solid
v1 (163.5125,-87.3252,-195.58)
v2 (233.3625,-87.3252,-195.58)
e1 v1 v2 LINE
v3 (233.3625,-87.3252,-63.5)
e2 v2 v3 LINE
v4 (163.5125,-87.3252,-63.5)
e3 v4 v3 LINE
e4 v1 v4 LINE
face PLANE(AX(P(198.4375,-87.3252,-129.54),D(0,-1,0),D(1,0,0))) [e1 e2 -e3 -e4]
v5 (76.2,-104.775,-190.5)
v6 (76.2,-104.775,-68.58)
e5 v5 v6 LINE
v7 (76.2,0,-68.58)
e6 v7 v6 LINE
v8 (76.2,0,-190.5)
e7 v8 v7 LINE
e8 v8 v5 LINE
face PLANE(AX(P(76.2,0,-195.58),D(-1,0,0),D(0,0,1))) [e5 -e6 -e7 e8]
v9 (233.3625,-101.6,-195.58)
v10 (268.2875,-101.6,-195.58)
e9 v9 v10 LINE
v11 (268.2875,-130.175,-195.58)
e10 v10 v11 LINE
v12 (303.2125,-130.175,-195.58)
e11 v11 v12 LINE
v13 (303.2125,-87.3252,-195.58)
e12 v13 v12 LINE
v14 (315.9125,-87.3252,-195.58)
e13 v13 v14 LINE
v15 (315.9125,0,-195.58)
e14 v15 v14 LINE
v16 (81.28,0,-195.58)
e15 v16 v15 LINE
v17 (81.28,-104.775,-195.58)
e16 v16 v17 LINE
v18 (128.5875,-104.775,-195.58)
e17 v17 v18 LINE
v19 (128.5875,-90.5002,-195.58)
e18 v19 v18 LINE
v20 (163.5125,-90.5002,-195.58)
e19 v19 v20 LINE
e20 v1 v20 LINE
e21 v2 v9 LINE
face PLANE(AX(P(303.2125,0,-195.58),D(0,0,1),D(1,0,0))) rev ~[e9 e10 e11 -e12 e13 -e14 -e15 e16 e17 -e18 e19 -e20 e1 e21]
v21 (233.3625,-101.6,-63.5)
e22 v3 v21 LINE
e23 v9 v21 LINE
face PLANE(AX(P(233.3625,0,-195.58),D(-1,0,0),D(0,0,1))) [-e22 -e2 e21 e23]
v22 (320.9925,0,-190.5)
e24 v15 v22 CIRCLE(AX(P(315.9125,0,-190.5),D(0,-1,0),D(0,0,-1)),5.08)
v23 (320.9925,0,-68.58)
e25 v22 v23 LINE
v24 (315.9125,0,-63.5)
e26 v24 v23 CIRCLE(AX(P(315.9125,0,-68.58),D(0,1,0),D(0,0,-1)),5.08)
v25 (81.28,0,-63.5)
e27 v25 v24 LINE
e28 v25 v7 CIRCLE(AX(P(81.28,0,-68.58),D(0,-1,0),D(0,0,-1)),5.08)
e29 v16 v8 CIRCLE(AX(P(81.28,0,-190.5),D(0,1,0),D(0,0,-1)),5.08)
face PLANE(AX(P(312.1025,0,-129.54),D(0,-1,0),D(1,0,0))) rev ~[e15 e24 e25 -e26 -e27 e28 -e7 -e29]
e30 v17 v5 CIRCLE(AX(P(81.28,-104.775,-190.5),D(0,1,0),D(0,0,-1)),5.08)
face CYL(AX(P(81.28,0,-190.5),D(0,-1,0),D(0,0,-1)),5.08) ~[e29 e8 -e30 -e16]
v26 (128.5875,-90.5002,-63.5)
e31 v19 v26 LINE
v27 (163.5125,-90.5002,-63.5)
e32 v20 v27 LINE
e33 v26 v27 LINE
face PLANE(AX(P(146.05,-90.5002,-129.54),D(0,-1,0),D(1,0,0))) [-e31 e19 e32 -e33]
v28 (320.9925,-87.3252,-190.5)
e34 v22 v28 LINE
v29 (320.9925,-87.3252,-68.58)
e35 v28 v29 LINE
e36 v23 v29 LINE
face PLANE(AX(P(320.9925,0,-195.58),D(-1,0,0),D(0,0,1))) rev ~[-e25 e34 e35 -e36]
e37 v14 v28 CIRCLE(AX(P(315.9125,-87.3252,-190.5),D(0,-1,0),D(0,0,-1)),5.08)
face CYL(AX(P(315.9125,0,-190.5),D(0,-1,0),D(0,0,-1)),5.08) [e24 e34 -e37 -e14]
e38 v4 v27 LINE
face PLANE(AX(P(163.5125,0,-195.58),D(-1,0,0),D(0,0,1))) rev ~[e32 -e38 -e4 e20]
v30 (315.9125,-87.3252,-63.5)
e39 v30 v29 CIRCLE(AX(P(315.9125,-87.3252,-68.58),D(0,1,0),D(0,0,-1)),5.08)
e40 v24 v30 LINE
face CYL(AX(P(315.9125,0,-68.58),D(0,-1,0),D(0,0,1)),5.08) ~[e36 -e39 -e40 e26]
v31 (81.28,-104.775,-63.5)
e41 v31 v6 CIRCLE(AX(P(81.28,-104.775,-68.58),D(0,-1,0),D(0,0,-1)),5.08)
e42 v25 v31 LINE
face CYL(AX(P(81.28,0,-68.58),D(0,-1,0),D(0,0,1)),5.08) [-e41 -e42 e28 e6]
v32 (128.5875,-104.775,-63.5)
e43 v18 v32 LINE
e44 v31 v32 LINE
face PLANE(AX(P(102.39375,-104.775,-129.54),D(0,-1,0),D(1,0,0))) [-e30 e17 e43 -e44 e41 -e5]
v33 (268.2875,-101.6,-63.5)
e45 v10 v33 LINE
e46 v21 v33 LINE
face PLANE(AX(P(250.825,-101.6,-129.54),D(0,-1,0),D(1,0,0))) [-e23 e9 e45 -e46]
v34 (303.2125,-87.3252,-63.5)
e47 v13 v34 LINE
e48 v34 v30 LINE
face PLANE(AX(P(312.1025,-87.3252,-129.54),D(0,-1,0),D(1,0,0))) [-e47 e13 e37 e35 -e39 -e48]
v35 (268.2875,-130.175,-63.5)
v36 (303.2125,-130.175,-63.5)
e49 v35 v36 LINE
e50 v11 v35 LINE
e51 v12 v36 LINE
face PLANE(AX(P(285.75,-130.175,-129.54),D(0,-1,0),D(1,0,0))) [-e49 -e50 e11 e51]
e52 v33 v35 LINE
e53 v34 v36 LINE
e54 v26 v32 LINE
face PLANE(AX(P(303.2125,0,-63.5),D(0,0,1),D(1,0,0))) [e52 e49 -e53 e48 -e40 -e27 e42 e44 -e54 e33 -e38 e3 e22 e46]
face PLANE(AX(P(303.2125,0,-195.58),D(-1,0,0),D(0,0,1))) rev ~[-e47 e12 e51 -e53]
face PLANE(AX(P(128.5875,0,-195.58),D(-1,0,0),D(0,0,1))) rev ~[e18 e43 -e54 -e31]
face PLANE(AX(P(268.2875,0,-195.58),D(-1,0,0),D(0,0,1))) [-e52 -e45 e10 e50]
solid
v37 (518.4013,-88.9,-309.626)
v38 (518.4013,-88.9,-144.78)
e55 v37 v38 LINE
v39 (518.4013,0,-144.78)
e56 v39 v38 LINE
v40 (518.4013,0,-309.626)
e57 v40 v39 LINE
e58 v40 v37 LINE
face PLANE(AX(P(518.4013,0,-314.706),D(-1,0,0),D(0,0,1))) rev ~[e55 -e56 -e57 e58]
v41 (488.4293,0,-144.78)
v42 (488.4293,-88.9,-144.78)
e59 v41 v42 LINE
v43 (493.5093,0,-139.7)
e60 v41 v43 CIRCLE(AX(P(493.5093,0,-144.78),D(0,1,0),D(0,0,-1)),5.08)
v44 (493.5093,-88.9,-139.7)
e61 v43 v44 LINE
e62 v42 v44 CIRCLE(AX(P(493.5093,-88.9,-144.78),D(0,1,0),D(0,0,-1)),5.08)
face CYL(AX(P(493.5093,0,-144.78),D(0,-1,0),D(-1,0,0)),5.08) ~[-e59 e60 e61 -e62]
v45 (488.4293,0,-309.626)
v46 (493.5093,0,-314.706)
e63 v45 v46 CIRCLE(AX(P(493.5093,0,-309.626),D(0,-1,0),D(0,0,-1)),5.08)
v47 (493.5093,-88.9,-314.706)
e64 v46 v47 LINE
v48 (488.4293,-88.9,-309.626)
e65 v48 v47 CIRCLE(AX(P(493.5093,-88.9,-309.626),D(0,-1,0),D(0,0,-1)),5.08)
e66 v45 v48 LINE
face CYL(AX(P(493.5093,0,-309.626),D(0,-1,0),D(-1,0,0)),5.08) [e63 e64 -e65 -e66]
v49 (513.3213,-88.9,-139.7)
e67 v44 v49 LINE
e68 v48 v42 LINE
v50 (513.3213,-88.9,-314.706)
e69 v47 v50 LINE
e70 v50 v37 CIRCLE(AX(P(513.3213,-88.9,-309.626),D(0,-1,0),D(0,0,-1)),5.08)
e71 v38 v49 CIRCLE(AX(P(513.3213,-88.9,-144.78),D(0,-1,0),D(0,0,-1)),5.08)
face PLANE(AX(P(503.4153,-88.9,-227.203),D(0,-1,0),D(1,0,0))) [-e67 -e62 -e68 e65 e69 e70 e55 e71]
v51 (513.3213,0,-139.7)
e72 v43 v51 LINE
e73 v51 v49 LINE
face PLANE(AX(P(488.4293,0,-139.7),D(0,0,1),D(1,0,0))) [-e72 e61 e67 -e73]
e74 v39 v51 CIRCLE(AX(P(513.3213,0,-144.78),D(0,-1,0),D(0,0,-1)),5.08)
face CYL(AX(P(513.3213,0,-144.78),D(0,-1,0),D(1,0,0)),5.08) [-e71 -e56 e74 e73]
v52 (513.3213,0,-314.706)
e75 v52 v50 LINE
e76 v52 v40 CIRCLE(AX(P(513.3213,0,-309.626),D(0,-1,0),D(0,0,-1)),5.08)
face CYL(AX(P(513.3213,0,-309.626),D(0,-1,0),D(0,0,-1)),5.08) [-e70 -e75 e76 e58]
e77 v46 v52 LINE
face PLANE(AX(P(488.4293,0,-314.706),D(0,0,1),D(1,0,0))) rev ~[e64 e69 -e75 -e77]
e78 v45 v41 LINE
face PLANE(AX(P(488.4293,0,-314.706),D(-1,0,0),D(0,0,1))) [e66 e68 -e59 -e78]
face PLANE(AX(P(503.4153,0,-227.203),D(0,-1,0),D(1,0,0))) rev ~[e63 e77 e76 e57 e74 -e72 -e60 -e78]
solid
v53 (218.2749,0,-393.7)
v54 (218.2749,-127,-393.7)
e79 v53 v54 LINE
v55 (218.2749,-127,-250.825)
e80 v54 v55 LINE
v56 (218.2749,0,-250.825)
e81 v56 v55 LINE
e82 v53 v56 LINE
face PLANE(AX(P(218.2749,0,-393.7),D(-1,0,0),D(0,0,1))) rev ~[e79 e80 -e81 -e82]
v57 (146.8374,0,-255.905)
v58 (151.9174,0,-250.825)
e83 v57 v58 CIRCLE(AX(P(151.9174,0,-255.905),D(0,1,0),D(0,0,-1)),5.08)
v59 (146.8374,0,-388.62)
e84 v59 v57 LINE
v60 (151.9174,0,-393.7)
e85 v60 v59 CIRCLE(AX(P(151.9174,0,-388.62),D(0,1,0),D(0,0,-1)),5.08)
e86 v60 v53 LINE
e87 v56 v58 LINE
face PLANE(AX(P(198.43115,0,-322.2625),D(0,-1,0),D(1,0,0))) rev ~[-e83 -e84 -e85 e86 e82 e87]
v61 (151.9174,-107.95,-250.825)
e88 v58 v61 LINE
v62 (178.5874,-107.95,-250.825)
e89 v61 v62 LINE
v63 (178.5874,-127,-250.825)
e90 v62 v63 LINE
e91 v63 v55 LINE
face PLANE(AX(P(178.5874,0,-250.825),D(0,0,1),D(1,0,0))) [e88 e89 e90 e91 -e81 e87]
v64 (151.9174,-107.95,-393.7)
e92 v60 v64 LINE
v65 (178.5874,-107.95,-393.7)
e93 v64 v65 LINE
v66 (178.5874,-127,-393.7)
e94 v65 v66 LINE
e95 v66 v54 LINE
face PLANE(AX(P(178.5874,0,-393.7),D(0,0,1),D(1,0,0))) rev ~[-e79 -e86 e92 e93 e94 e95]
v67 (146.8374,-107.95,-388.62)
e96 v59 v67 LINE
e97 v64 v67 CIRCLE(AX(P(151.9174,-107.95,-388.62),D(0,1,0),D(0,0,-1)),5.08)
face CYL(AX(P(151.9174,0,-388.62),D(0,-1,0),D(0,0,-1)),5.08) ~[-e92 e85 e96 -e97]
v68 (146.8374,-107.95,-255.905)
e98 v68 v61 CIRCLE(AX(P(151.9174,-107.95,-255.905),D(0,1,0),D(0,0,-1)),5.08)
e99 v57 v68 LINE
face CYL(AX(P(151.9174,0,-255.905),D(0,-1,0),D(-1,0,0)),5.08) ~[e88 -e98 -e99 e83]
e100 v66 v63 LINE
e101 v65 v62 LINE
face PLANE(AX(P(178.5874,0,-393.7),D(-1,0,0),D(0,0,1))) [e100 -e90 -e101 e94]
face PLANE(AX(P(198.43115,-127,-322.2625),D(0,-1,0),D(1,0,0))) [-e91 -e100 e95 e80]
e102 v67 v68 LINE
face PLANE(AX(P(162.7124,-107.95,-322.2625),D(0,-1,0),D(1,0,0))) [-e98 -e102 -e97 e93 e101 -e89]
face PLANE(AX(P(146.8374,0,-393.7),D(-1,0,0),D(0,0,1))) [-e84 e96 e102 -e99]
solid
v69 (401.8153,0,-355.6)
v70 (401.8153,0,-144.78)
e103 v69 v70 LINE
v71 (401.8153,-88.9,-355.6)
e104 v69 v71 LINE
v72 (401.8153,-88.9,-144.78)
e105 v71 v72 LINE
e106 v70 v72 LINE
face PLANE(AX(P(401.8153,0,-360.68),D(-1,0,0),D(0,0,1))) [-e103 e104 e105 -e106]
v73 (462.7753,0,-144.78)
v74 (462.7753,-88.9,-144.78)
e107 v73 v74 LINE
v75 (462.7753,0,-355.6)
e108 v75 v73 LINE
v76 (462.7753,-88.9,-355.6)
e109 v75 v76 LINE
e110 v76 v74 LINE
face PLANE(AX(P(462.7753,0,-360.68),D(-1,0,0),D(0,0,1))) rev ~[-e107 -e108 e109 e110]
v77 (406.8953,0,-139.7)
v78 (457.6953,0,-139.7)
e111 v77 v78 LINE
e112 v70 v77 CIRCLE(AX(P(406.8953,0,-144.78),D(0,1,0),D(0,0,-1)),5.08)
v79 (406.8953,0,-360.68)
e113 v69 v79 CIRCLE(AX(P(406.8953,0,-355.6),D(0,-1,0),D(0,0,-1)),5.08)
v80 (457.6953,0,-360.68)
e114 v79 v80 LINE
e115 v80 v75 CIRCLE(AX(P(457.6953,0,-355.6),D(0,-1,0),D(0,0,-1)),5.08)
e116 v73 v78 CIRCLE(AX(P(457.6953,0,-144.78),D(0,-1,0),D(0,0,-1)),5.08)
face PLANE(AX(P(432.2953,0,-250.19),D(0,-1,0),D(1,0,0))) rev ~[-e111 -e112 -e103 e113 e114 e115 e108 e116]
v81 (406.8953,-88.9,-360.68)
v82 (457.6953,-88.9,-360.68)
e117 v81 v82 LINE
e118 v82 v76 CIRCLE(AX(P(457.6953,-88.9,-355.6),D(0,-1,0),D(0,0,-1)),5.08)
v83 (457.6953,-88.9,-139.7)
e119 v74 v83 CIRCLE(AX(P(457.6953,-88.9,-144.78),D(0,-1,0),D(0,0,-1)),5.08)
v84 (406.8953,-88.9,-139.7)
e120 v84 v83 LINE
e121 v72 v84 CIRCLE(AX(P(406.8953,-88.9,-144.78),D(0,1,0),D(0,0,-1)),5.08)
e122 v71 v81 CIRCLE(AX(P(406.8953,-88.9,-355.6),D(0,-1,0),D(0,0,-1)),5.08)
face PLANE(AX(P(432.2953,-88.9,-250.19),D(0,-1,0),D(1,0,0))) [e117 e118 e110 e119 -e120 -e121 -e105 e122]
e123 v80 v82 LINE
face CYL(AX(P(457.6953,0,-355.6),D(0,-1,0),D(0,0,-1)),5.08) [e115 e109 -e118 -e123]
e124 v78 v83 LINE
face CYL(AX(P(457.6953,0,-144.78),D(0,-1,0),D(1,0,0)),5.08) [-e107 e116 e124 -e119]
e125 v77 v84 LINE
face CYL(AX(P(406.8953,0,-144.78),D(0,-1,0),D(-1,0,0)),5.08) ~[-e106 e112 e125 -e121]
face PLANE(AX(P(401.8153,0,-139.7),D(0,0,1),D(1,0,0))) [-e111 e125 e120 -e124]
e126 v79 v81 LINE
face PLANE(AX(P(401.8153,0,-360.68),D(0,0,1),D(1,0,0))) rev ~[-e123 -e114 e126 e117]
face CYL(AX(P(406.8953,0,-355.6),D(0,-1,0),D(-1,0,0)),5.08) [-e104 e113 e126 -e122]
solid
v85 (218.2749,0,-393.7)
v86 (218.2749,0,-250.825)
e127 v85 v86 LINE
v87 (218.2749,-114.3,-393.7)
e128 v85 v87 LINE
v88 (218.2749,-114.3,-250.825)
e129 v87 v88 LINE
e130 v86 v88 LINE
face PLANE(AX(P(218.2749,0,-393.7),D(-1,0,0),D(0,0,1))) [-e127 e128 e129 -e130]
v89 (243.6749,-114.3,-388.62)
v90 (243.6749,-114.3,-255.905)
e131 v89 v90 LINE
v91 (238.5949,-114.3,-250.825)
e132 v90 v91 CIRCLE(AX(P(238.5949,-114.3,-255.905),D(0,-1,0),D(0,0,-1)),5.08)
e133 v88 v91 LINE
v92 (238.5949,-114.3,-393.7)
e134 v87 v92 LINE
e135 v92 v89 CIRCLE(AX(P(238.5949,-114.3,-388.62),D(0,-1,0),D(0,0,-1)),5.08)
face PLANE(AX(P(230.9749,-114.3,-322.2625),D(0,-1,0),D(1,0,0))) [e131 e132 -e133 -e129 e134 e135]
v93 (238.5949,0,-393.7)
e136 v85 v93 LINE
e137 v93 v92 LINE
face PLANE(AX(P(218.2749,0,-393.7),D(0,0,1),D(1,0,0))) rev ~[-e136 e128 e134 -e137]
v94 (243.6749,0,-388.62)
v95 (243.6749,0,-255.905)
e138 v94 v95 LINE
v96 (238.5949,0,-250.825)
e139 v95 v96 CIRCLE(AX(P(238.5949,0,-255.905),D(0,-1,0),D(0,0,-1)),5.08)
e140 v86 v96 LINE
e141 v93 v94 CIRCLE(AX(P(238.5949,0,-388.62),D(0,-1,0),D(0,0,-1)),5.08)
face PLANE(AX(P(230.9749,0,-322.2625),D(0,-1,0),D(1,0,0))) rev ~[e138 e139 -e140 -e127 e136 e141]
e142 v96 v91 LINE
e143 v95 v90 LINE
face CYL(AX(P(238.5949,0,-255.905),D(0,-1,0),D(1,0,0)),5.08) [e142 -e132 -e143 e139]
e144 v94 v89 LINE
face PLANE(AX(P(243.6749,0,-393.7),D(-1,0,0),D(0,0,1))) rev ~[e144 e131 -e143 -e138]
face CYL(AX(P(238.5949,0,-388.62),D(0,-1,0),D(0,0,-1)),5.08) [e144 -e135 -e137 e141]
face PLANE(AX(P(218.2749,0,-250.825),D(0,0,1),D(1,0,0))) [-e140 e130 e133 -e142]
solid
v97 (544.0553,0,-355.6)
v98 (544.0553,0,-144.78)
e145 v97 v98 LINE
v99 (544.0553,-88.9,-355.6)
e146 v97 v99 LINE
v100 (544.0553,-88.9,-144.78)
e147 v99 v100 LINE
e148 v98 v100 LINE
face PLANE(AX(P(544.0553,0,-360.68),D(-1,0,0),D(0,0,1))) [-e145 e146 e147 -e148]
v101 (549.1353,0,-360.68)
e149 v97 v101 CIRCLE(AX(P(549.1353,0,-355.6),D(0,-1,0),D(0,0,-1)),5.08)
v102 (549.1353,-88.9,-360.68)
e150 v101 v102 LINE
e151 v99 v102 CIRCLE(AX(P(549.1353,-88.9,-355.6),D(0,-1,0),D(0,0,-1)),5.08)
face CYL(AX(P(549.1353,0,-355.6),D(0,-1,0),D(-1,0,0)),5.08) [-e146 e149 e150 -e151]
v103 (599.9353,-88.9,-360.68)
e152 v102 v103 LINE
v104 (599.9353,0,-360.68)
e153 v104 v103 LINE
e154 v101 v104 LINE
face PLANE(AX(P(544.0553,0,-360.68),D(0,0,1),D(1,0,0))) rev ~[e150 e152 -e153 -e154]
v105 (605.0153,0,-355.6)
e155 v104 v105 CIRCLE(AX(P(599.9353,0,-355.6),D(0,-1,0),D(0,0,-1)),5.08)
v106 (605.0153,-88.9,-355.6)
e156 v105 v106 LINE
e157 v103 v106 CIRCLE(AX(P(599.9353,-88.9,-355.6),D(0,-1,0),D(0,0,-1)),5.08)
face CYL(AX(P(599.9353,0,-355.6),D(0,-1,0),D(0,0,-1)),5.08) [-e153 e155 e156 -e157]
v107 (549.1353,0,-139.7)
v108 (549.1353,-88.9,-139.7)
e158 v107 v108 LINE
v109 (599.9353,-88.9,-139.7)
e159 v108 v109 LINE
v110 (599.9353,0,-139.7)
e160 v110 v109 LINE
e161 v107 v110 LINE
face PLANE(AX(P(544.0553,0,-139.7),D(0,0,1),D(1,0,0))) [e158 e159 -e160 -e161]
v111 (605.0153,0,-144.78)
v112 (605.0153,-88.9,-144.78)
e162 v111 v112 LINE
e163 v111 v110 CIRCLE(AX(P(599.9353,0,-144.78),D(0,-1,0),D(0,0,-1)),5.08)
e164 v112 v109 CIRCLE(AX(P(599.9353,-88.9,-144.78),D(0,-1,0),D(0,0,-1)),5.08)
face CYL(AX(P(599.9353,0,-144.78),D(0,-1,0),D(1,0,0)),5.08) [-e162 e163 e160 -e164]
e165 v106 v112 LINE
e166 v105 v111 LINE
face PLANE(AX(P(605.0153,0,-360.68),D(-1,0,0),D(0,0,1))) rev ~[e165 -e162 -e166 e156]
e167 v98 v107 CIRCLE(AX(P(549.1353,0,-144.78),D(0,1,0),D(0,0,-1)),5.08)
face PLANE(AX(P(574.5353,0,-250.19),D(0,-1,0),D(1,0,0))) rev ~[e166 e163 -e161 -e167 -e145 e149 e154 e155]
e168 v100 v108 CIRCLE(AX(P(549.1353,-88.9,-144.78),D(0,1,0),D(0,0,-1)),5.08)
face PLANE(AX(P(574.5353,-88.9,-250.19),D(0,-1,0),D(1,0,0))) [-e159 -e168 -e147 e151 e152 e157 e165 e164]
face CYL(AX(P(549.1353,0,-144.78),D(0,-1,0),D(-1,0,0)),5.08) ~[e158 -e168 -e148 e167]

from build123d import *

# Parameters (mm, degrees)
F0_W      = 60.96
F0_H      = 220.98
F1_DEPTH  = 88.9
F0_W_2    = 29.972
F0_H_2    = 175.006
F2_R      = 5.08
F2_2_R    = 5.08
F2_3_R    = 5.08
F3_R      = 5.08
F0_W_3    = 52.3875
F0_H_3    = 132.08
F4_DEPTH  = 104.775
F0_W_4    = 34.925
F5_DEPTH  = 90.5002
F0_W_5    = 69.85
F6_DEPTH  = 87.3252
F7_DEPTH  = 101.6
F8_DEPTH  = 130.175
F0_W_6    = 17.78
F9_DEPTH  = 87.3252
F0_W_7    = 31.75
F0_H_4    = 142.875
F10_DEPTH = 107.95
F0_W_8    = 39.6875
F11_DEPTH = 127
F0_W_9    = 25.4
F12_DEPTH = 114.3
F13_R     = 5.08
F13_2_R   = 5.08
F13_3_R   = 5.08


with BuildPart() as f1:
    # F0 (on Front) → F1 (new body)
    with BuildSketch(Plane.XZ):
        with Locations((432.2953, -250.19)):
            Rectangle(F0_W, F0_H)
    extrude(amount=F1_DEPTH)

    # F2
    f2_edges = [f1.edges().sort_by_distance(p)[0] for p in [
        (462.7753, -44.45, -139.7),
        (401.8153, -44.45, -139.7),
        (401.8153, -44.45, -360.68),
        (462.7753, -44.45, -360.68),
    ]]
    fillet(f2_edges, radius=F2_R)


with BuildPart() as f1b:
    # F0 (on Front) → F1, piece 2 (new body)
    with BuildSketch(Plane.XZ):
        with Locations((574.5353, -250.19)):
            Rectangle(F0_W, F0_H)
    extrude(amount=F1_DEPTH)

    # F2#2
    f2_2_edges = [f1b.edges().sort_by_distance(p)[0] for p in [
        (605.0153, -44.45, -139.7),
        (544.0553, -44.45, -139.7),
        (544.0553, -44.45, -360.68),
        (605.0153, -44.45, -360.68),
    ]]
    fillet(f2_2_edges, radius=F2_2_R)


with BuildPart() as f1c:
    # F0 (on Front) → F1, piece 3 (new body)
    with BuildSketch(Plane.XZ):
        with Locations((503.4153, -227.203)):
            Rectangle(F0_W_2, F0_H_2)
    extrude(amount=F1_DEPTH)

    # F2#3
    f2_3_edges = [f1c.edges().sort_by_distance(p)[0] for p in [
        (518.4013, -44.45, -139.7),
        (488.4293, -44.45, -314.706),
        (518.4013, -44.45, -314.706),
    ]]
    fillet(f2_3_edges, radius=F2_3_R)

    # F3
    f3_edges = [f1c.edges().sort_by_distance(p)[0] for p in [
        (488.4293, -44.45, -139.7),
    ]]
    fillet(f3_edges, radius=F3_R)


with BuildPart() as f4:
    # F0 (on Front) → F4 (new body)
    with BuildSketch(Plane.XZ):
        with Locations((102.39375, -129.54)):
            Rectangle(F0_W_3, F0_H_3)
    extrude(amount=F4_DEPTH)

    # F0 (on Front) → F5 (join)
    with BuildSketch(Plane.XZ):
        with Locations((146.05, -129.54)):
            Rectangle(F0_W_4, F0_H_3)
    extrude(amount=F5_DEPTH)

    # F0 (on Front) → F6 (join)
    with BuildSketch(Plane.XZ):
        with Locations((198.4375, -129.54)):
            Rectangle(F0_W_5, F0_H_3)
    extrude(amount=F6_DEPTH)

    # F0 (on Front) → F7 (join)
    with BuildSketch(Plane.XZ):
        with Locations((250.825, -129.54)):
            Rectangle(F0_W_4, F0_H_3)
    extrude(amount=F7_DEPTH)

    # F0 (on Front) → F8 (join)
    with BuildSketch(Plane.XZ):
        with Locations((285.75, -129.54)):
            Rectangle(F0_W_4, F0_H_3)
    extrude(amount=F8_DEPTH)

    # F0 (on Front) → F9 (join)
    with BuildSketch(Plane.XZ):
        with Locations((312.1025, -129.54)):
            Rectangle(F0_W_6, F0_H_3)
    extrude(amount=F9_DEPTH)

    # F13
    f13_edges = [f4.edges().sort_by_distance(p)[0] for p in [
        (320.9925, -43.6626, -63.5),
        (76.2, -52.3875, -63.5),
        (320.9925, -43.6626, -195.58),
        (76.2, -52.3875, -195.58),
    ]]
    fillet(f13_edges, radius=F13_R)


with BuildPart() as f10:
    # F0 (on Front) → F10 (new body)
    with BuildSketch(Plane.XZ):
        with Locations((162.7124, -322.2625)):
            Rectangle(F0_W_7, F0_H_4)
    extrude(amount=F10_DEPTH)

    # F0 (on Front) → F11 (join)
    with BuildSketch(Plane.XZ):
        with Locations((198.43115, -322.2625)):
            Rectangle(F0_W_8, F0_H_4)
    extrude(amount=F11_DEPTH)

    # F13#2
    f13_2_edges = [f10.edges().sort_by_distance(p)[0] for p in [
        (146.8374, -53.975, -250.825),
        (146.8374, -53.975, -393.7),
    ]]
    fillet(f13_2_edges, radius=F13_2_R)


with BuildPart() as f12:
    # F0 (on Front) → F12 (new body)
    with BuildSketch(Plane.XZ):
        with Locations((230.9749, -322.2625)):
            Rectangle(F0_W_9, F0_H_4)
    extrude(amount=F12_DEPTH)

    # F13#3
    f13_3_edges = [f12.edges().sort_by_distance(p)[0] for p in [
        (243.6749, -57.15, -250.825),
        (243.6749, -57.15, -393.7),
    ]]
    fillet(f13_3_edges, radius=F13_3_R)


solid = Compound([f1.part, f1b.part, f1c.part, f4.part, f10.part, f12.part])
